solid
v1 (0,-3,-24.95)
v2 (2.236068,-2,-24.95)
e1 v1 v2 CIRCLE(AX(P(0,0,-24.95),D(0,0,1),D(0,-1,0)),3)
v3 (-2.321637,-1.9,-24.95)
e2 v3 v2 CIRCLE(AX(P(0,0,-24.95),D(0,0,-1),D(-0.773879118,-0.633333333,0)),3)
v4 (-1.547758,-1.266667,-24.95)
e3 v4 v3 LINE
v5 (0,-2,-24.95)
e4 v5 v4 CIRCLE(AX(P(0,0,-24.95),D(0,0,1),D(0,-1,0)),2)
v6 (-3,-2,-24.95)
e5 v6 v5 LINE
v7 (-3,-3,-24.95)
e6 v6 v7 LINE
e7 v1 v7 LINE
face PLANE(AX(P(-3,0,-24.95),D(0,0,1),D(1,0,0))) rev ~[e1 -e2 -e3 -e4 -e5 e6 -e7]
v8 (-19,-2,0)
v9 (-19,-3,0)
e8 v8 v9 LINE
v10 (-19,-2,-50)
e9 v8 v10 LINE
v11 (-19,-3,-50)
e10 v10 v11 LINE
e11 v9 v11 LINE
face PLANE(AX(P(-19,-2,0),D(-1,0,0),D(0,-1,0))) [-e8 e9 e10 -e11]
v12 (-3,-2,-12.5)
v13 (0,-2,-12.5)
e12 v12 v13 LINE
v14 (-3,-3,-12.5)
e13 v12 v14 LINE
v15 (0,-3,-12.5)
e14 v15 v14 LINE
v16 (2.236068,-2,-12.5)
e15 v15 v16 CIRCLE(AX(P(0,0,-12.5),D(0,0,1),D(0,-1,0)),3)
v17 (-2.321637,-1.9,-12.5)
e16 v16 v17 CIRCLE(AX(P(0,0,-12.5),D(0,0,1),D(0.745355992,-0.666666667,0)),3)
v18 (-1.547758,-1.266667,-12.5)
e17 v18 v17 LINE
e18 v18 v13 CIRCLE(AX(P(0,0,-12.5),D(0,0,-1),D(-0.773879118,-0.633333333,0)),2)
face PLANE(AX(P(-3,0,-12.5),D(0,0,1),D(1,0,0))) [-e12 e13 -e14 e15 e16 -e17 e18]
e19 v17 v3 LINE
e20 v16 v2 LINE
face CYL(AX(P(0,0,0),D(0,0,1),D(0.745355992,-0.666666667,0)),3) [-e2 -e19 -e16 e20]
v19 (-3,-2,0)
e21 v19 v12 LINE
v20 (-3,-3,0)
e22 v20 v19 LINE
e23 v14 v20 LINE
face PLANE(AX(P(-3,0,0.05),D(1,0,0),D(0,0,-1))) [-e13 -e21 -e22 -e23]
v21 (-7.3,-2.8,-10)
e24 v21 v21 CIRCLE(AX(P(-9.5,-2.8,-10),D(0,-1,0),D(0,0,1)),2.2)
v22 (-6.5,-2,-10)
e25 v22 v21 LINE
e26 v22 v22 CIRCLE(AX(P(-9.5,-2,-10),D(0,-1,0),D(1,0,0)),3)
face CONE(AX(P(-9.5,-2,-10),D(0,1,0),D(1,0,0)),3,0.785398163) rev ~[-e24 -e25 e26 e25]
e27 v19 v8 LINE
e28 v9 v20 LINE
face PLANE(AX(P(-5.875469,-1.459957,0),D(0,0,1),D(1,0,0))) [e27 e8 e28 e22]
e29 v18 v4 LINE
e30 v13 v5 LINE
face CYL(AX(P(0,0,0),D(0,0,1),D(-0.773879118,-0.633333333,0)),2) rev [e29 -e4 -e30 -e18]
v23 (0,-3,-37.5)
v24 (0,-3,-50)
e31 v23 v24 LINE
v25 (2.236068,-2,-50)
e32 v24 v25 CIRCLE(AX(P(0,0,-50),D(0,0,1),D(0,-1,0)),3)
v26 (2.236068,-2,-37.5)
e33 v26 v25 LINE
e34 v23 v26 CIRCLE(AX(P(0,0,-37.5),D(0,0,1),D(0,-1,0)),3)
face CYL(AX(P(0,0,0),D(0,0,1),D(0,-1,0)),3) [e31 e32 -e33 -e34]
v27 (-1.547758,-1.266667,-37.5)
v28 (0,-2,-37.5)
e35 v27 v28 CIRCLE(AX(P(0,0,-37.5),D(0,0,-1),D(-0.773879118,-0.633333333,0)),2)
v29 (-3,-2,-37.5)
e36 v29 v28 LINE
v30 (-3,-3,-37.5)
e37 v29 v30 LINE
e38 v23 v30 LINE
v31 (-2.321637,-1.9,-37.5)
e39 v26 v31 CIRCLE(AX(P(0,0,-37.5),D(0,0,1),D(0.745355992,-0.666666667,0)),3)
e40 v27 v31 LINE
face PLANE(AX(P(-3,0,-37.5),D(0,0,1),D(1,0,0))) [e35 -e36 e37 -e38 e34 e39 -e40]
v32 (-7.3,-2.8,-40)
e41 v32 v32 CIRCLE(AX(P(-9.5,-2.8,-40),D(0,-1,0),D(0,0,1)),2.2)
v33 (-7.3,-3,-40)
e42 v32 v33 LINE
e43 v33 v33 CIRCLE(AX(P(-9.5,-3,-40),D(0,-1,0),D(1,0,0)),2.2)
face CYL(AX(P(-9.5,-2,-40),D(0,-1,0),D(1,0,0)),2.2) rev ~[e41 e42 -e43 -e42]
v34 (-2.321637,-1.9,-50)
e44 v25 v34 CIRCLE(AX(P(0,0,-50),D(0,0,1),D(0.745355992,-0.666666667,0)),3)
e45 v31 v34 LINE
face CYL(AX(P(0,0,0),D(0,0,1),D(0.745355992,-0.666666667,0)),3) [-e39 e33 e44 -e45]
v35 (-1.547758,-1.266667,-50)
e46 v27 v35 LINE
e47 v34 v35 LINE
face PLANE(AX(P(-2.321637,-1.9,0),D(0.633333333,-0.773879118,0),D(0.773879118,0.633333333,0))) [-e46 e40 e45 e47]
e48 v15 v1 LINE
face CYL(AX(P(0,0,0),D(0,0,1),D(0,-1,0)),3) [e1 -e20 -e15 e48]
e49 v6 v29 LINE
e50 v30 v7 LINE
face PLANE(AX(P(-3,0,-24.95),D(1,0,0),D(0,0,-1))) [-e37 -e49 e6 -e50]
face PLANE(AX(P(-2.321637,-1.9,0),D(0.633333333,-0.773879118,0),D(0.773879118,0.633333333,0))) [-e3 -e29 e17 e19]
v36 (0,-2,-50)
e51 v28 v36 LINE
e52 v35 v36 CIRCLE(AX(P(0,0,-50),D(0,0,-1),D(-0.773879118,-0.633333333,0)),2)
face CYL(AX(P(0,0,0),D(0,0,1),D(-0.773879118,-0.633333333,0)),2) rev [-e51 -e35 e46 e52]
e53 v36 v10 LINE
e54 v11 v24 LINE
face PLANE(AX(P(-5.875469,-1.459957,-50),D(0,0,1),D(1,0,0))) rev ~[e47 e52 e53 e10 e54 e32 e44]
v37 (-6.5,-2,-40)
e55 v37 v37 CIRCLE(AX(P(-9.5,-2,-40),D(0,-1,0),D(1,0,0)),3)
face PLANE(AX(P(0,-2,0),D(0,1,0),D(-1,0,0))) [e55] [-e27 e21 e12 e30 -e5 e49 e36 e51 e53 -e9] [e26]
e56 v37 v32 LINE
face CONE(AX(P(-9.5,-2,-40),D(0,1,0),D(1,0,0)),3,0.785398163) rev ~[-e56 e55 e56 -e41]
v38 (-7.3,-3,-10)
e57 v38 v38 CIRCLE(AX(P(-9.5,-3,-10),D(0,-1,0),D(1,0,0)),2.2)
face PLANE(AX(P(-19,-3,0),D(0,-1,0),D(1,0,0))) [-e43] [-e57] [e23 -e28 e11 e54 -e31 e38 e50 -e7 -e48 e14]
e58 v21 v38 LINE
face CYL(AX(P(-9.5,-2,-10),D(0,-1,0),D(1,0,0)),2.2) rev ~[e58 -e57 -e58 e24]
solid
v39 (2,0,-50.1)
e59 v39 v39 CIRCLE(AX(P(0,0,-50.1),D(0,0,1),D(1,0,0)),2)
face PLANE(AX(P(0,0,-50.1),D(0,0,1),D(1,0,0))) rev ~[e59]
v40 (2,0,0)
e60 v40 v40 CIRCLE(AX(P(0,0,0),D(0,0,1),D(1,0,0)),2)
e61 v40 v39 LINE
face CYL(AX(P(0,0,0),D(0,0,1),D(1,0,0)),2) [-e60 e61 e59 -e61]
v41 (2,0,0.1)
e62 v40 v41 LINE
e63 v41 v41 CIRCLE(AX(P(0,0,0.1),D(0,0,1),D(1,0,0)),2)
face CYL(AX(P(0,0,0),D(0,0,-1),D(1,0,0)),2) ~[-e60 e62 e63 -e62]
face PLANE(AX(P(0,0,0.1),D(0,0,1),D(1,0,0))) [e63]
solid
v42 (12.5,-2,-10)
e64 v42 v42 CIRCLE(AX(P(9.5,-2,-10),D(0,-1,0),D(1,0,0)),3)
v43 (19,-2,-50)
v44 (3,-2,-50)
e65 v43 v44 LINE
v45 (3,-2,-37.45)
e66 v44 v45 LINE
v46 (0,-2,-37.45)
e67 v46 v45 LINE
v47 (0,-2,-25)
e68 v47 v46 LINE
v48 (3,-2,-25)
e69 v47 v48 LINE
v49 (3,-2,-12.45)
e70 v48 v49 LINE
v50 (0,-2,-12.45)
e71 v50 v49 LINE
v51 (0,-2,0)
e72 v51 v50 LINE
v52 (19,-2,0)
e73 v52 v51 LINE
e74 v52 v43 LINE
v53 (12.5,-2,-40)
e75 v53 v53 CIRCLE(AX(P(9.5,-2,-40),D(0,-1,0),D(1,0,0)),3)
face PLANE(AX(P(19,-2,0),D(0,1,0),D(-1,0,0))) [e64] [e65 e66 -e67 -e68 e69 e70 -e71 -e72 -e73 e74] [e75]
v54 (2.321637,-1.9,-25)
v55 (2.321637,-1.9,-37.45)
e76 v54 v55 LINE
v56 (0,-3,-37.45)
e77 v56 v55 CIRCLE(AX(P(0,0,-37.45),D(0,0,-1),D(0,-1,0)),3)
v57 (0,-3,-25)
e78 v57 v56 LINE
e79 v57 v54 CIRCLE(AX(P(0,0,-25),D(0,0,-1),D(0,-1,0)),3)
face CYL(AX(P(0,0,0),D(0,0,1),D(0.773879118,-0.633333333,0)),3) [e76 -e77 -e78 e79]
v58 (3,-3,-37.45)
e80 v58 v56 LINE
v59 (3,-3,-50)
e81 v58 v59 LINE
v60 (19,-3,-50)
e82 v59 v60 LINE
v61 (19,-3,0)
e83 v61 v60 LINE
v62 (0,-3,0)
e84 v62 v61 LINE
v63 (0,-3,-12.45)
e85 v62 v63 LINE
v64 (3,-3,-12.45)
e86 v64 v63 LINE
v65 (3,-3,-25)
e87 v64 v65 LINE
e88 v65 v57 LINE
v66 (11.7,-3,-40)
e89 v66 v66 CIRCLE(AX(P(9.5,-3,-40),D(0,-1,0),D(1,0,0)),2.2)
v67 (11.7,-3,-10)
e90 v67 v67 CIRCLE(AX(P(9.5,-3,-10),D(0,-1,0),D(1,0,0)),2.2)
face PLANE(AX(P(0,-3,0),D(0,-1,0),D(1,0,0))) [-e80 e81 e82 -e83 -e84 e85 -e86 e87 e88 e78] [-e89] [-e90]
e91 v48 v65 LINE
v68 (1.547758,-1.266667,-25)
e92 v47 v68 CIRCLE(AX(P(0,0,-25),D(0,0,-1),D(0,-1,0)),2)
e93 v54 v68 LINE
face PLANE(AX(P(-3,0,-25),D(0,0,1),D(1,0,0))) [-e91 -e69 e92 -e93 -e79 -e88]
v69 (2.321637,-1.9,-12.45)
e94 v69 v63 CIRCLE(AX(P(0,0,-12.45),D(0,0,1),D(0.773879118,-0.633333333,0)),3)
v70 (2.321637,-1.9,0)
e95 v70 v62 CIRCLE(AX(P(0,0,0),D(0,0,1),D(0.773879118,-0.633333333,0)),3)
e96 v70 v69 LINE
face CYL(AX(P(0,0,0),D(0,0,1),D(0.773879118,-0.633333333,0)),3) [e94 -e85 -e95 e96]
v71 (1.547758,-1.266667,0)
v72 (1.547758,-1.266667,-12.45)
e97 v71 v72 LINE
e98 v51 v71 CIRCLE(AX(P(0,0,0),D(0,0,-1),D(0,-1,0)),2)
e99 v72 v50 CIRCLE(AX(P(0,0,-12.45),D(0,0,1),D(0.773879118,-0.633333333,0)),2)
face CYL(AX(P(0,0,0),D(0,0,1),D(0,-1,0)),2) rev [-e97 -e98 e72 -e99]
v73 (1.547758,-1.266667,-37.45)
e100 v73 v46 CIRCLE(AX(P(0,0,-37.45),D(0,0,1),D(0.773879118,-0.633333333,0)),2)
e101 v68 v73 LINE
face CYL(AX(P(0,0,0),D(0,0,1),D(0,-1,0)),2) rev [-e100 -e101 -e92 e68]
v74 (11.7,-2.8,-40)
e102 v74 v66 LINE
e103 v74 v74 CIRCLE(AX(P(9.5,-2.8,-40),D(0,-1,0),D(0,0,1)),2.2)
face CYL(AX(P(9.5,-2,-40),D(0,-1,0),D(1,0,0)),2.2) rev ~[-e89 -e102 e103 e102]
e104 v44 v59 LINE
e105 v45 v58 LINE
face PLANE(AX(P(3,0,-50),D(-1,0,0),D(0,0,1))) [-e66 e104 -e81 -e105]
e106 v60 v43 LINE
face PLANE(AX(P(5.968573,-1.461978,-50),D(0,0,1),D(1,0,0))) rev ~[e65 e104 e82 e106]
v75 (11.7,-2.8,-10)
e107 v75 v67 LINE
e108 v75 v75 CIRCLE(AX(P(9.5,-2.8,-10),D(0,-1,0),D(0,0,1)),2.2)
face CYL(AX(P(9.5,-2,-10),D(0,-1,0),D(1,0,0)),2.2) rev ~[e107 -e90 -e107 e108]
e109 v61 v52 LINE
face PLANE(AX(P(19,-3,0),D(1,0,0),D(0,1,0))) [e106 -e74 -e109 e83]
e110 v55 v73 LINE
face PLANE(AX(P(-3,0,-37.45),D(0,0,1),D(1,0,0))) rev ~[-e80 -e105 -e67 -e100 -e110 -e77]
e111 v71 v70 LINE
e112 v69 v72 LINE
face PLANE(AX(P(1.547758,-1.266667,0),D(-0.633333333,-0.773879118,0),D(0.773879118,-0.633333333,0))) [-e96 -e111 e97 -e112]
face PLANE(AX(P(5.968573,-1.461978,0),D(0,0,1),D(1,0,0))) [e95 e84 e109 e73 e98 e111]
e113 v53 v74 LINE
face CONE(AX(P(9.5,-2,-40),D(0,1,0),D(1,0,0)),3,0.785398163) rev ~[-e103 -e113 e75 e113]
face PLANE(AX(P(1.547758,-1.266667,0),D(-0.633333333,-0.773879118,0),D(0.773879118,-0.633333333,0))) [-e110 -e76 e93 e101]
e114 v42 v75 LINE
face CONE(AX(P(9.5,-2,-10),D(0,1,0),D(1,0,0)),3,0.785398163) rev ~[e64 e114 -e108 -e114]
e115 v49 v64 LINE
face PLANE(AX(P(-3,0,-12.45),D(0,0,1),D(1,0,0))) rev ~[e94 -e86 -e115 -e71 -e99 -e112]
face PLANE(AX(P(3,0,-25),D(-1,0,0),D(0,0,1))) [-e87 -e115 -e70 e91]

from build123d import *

# Parameters (mm, degrees)
F1_DEPTH          = 50
F3_DEPTH          = 50
F4_W              = 6
F4_H              = 0.05
F4_H_2            = 12.45
F4_H_3            = 12.5
F5_DEPTH          = 3.001
F5_DEPTH_BACK     = 3.001
F6_DEPTH          = 3.001
F6_DEPTH_BACK     = 3.001
F7_R              = 2
F8_DEPTH          = 50.1
F8_DEPTH_BACK     = 0.1
F10_D             = 4.4
F10_DEPTH         = 10
F10_CSINK_D       = 6
F10_CSINK_ANGLE   = 90
F10_TIP           = 1.3218933619
F10_2_D           = 4.4
F10_2_DEPTH       = 10
F10_2_CSINK_D     = 6
F10_2_CSINK_ANGLE = 90
F10_2_TIP         = 1.3218933619


with BuildPart() as f1:
    # F0 (on Top) → F1 (new body)
    with BuildSketch(Plane.XY):
        with BuildLine():
            Line((-19, -3), (0, -3))
            ThreePointArc((0, -3), (1.2247448714, -2.7386127875), (2.2360679775, -2))
            ThreePointArc((2.2360679775, -2), (0.0658067589, 2.9992781582), (-2.3216373532, -1.9))
            Line((-2.3216373532, -1.9), (-1.5477582355, -1.2666666667))
            ThreePointArc((-1.5477582355, -1.2666666667), (0.8563488386, 1.8073922282), (0, -2))
            Line((0, -2), (-19, -2))
            Line((-19, -2), (-19, -3))
        make_face()
    extrude(amount=-F1_DEPTH)

    # F4 (on Front) → F5 (cut, two sides)
    with BuildSketch(Plane.XZ) as f5_sk:
        with Locations((0, -37.475)):
            Rectangle(F4_W, F4_H)
        with Locations((0, -31.225)):
            Rectangle(F4_W, F4_H_2)
        with Locations((0, -24.975)):
            Rectangle(F4_W, F4_H)
        with Locations((0, -12.475)):
            Rectangle(F4_W, F4_H)
        with Locations((0, -6.2)):
            Rectangle(F4_W, F4_H_3)
    extrude(amount=-F5_DEPTH, mode=Mode.SUBTRACT)
    extrude(f5_sk.sketch, amount=F5_DEPTH_BACK, mode=Mode.SUBTRACT)

    # F10
    with Locations(Plane(origin=(0, -2, 0), x_dir=(-1, 0, 0), z_dir=(0, 1, 0))):
        with Locations((9.5, -10), (9.5, -40), (-9.5, -40), (-9.5, -10)):
            CounterSinkHole(F10_D / 2, F10_CSINK_D / 2, depth=F10_DEPTH, counter_sink_angle=F10_CSINK_ANGLE)
            with Locations((0, 0, -(F10_DEPTH + F10_TIP / 2))):  # 118° drill point
                Cone(0, F10_D / 2, F10_TIP, mode=Mode.SUBTRACT)


with BuildPart() as f3:
    # F2 (on Top) → F3 (new body)
    with BuildSketch(Plane.XY):
        with BuildLine():
            Line((1.5477582355, -1.2666666667), (2.3216373532, -1.9))
            ThreePointArc((2.3216373532, -1.9), (-1.2845232579, 2.7110883423), (0, -3))
            Line((0, -3), (19, -3))
            Line((19, -3), (19, -2))
            Line((19, -2), (0, -2))
            ThreePointArc((0, -2), (-0.8563488386, 1.8073922282), (1.5477582355, -1.2666666667))
        make_face()
    extrude(amount=-F3_DEPTH)

    # F4 (on Front) → F6 (cut, two sides)
    with BuildSketch(Plane.XZ) as f6_sk:
        with Locations((0, -43.75)):
            Rectangle(F4_W, F4_H_3)
        with Locations((0, -37.475)):
            Rectangle(F4_W, F4_H)
        with Locations((0, -24.975)):
            Rectangle(F4_W, F4_H)
        with Locations((0, -18.725)):
            Rectangle(F4_W, F4_H_2)
        with Locations((0, -12.475)):
            Rectangle(F4_W, F4_H)
    extrude(amount=-F6_DEPTH, mode=Mode.SUBTRACT)
    extrude(f6_sk.sketch, amount=F6_DEPTH_BACK, mode=Mode.SUBTRACT)

    # F10#2
    with Locations(Plane(origin=(0, -2, 0), x_dir=(-1, 0, 0), z_dir=(0, 1, 0))):
        with Locations((9.5, -10), (9.5, -40), (-9.5, -40), (-9.5, -10)):
            CounterSinkHole(F10_2_D / 2, F10_2_CSINK_D / 2, depth=F10_2_DEPTH, counter_sink_angle=F10_2_CSINK_ANGLE)
            with Locations((0, 0, -(F10_2_DEPTH + F10_2_TIP / 2))):  # 118° drill point
                Cone(0, F10_2_D / 2, F10_2_TIP, mode=Mode.SUBTRACT)


with BuildPart() as f8:
    # F7 (on Top) → F8 (new body, two sides)
    with BuildSketch(Plane.XY) as f8_sk:
        Circle(F7_R)
    extrude(amount=-F8_DEPTH)
    extrude(f8_sk.sketch, amount=F8_DEPTH_BACK)


solid = Compound([f1.part, f3.part, f8.part])
